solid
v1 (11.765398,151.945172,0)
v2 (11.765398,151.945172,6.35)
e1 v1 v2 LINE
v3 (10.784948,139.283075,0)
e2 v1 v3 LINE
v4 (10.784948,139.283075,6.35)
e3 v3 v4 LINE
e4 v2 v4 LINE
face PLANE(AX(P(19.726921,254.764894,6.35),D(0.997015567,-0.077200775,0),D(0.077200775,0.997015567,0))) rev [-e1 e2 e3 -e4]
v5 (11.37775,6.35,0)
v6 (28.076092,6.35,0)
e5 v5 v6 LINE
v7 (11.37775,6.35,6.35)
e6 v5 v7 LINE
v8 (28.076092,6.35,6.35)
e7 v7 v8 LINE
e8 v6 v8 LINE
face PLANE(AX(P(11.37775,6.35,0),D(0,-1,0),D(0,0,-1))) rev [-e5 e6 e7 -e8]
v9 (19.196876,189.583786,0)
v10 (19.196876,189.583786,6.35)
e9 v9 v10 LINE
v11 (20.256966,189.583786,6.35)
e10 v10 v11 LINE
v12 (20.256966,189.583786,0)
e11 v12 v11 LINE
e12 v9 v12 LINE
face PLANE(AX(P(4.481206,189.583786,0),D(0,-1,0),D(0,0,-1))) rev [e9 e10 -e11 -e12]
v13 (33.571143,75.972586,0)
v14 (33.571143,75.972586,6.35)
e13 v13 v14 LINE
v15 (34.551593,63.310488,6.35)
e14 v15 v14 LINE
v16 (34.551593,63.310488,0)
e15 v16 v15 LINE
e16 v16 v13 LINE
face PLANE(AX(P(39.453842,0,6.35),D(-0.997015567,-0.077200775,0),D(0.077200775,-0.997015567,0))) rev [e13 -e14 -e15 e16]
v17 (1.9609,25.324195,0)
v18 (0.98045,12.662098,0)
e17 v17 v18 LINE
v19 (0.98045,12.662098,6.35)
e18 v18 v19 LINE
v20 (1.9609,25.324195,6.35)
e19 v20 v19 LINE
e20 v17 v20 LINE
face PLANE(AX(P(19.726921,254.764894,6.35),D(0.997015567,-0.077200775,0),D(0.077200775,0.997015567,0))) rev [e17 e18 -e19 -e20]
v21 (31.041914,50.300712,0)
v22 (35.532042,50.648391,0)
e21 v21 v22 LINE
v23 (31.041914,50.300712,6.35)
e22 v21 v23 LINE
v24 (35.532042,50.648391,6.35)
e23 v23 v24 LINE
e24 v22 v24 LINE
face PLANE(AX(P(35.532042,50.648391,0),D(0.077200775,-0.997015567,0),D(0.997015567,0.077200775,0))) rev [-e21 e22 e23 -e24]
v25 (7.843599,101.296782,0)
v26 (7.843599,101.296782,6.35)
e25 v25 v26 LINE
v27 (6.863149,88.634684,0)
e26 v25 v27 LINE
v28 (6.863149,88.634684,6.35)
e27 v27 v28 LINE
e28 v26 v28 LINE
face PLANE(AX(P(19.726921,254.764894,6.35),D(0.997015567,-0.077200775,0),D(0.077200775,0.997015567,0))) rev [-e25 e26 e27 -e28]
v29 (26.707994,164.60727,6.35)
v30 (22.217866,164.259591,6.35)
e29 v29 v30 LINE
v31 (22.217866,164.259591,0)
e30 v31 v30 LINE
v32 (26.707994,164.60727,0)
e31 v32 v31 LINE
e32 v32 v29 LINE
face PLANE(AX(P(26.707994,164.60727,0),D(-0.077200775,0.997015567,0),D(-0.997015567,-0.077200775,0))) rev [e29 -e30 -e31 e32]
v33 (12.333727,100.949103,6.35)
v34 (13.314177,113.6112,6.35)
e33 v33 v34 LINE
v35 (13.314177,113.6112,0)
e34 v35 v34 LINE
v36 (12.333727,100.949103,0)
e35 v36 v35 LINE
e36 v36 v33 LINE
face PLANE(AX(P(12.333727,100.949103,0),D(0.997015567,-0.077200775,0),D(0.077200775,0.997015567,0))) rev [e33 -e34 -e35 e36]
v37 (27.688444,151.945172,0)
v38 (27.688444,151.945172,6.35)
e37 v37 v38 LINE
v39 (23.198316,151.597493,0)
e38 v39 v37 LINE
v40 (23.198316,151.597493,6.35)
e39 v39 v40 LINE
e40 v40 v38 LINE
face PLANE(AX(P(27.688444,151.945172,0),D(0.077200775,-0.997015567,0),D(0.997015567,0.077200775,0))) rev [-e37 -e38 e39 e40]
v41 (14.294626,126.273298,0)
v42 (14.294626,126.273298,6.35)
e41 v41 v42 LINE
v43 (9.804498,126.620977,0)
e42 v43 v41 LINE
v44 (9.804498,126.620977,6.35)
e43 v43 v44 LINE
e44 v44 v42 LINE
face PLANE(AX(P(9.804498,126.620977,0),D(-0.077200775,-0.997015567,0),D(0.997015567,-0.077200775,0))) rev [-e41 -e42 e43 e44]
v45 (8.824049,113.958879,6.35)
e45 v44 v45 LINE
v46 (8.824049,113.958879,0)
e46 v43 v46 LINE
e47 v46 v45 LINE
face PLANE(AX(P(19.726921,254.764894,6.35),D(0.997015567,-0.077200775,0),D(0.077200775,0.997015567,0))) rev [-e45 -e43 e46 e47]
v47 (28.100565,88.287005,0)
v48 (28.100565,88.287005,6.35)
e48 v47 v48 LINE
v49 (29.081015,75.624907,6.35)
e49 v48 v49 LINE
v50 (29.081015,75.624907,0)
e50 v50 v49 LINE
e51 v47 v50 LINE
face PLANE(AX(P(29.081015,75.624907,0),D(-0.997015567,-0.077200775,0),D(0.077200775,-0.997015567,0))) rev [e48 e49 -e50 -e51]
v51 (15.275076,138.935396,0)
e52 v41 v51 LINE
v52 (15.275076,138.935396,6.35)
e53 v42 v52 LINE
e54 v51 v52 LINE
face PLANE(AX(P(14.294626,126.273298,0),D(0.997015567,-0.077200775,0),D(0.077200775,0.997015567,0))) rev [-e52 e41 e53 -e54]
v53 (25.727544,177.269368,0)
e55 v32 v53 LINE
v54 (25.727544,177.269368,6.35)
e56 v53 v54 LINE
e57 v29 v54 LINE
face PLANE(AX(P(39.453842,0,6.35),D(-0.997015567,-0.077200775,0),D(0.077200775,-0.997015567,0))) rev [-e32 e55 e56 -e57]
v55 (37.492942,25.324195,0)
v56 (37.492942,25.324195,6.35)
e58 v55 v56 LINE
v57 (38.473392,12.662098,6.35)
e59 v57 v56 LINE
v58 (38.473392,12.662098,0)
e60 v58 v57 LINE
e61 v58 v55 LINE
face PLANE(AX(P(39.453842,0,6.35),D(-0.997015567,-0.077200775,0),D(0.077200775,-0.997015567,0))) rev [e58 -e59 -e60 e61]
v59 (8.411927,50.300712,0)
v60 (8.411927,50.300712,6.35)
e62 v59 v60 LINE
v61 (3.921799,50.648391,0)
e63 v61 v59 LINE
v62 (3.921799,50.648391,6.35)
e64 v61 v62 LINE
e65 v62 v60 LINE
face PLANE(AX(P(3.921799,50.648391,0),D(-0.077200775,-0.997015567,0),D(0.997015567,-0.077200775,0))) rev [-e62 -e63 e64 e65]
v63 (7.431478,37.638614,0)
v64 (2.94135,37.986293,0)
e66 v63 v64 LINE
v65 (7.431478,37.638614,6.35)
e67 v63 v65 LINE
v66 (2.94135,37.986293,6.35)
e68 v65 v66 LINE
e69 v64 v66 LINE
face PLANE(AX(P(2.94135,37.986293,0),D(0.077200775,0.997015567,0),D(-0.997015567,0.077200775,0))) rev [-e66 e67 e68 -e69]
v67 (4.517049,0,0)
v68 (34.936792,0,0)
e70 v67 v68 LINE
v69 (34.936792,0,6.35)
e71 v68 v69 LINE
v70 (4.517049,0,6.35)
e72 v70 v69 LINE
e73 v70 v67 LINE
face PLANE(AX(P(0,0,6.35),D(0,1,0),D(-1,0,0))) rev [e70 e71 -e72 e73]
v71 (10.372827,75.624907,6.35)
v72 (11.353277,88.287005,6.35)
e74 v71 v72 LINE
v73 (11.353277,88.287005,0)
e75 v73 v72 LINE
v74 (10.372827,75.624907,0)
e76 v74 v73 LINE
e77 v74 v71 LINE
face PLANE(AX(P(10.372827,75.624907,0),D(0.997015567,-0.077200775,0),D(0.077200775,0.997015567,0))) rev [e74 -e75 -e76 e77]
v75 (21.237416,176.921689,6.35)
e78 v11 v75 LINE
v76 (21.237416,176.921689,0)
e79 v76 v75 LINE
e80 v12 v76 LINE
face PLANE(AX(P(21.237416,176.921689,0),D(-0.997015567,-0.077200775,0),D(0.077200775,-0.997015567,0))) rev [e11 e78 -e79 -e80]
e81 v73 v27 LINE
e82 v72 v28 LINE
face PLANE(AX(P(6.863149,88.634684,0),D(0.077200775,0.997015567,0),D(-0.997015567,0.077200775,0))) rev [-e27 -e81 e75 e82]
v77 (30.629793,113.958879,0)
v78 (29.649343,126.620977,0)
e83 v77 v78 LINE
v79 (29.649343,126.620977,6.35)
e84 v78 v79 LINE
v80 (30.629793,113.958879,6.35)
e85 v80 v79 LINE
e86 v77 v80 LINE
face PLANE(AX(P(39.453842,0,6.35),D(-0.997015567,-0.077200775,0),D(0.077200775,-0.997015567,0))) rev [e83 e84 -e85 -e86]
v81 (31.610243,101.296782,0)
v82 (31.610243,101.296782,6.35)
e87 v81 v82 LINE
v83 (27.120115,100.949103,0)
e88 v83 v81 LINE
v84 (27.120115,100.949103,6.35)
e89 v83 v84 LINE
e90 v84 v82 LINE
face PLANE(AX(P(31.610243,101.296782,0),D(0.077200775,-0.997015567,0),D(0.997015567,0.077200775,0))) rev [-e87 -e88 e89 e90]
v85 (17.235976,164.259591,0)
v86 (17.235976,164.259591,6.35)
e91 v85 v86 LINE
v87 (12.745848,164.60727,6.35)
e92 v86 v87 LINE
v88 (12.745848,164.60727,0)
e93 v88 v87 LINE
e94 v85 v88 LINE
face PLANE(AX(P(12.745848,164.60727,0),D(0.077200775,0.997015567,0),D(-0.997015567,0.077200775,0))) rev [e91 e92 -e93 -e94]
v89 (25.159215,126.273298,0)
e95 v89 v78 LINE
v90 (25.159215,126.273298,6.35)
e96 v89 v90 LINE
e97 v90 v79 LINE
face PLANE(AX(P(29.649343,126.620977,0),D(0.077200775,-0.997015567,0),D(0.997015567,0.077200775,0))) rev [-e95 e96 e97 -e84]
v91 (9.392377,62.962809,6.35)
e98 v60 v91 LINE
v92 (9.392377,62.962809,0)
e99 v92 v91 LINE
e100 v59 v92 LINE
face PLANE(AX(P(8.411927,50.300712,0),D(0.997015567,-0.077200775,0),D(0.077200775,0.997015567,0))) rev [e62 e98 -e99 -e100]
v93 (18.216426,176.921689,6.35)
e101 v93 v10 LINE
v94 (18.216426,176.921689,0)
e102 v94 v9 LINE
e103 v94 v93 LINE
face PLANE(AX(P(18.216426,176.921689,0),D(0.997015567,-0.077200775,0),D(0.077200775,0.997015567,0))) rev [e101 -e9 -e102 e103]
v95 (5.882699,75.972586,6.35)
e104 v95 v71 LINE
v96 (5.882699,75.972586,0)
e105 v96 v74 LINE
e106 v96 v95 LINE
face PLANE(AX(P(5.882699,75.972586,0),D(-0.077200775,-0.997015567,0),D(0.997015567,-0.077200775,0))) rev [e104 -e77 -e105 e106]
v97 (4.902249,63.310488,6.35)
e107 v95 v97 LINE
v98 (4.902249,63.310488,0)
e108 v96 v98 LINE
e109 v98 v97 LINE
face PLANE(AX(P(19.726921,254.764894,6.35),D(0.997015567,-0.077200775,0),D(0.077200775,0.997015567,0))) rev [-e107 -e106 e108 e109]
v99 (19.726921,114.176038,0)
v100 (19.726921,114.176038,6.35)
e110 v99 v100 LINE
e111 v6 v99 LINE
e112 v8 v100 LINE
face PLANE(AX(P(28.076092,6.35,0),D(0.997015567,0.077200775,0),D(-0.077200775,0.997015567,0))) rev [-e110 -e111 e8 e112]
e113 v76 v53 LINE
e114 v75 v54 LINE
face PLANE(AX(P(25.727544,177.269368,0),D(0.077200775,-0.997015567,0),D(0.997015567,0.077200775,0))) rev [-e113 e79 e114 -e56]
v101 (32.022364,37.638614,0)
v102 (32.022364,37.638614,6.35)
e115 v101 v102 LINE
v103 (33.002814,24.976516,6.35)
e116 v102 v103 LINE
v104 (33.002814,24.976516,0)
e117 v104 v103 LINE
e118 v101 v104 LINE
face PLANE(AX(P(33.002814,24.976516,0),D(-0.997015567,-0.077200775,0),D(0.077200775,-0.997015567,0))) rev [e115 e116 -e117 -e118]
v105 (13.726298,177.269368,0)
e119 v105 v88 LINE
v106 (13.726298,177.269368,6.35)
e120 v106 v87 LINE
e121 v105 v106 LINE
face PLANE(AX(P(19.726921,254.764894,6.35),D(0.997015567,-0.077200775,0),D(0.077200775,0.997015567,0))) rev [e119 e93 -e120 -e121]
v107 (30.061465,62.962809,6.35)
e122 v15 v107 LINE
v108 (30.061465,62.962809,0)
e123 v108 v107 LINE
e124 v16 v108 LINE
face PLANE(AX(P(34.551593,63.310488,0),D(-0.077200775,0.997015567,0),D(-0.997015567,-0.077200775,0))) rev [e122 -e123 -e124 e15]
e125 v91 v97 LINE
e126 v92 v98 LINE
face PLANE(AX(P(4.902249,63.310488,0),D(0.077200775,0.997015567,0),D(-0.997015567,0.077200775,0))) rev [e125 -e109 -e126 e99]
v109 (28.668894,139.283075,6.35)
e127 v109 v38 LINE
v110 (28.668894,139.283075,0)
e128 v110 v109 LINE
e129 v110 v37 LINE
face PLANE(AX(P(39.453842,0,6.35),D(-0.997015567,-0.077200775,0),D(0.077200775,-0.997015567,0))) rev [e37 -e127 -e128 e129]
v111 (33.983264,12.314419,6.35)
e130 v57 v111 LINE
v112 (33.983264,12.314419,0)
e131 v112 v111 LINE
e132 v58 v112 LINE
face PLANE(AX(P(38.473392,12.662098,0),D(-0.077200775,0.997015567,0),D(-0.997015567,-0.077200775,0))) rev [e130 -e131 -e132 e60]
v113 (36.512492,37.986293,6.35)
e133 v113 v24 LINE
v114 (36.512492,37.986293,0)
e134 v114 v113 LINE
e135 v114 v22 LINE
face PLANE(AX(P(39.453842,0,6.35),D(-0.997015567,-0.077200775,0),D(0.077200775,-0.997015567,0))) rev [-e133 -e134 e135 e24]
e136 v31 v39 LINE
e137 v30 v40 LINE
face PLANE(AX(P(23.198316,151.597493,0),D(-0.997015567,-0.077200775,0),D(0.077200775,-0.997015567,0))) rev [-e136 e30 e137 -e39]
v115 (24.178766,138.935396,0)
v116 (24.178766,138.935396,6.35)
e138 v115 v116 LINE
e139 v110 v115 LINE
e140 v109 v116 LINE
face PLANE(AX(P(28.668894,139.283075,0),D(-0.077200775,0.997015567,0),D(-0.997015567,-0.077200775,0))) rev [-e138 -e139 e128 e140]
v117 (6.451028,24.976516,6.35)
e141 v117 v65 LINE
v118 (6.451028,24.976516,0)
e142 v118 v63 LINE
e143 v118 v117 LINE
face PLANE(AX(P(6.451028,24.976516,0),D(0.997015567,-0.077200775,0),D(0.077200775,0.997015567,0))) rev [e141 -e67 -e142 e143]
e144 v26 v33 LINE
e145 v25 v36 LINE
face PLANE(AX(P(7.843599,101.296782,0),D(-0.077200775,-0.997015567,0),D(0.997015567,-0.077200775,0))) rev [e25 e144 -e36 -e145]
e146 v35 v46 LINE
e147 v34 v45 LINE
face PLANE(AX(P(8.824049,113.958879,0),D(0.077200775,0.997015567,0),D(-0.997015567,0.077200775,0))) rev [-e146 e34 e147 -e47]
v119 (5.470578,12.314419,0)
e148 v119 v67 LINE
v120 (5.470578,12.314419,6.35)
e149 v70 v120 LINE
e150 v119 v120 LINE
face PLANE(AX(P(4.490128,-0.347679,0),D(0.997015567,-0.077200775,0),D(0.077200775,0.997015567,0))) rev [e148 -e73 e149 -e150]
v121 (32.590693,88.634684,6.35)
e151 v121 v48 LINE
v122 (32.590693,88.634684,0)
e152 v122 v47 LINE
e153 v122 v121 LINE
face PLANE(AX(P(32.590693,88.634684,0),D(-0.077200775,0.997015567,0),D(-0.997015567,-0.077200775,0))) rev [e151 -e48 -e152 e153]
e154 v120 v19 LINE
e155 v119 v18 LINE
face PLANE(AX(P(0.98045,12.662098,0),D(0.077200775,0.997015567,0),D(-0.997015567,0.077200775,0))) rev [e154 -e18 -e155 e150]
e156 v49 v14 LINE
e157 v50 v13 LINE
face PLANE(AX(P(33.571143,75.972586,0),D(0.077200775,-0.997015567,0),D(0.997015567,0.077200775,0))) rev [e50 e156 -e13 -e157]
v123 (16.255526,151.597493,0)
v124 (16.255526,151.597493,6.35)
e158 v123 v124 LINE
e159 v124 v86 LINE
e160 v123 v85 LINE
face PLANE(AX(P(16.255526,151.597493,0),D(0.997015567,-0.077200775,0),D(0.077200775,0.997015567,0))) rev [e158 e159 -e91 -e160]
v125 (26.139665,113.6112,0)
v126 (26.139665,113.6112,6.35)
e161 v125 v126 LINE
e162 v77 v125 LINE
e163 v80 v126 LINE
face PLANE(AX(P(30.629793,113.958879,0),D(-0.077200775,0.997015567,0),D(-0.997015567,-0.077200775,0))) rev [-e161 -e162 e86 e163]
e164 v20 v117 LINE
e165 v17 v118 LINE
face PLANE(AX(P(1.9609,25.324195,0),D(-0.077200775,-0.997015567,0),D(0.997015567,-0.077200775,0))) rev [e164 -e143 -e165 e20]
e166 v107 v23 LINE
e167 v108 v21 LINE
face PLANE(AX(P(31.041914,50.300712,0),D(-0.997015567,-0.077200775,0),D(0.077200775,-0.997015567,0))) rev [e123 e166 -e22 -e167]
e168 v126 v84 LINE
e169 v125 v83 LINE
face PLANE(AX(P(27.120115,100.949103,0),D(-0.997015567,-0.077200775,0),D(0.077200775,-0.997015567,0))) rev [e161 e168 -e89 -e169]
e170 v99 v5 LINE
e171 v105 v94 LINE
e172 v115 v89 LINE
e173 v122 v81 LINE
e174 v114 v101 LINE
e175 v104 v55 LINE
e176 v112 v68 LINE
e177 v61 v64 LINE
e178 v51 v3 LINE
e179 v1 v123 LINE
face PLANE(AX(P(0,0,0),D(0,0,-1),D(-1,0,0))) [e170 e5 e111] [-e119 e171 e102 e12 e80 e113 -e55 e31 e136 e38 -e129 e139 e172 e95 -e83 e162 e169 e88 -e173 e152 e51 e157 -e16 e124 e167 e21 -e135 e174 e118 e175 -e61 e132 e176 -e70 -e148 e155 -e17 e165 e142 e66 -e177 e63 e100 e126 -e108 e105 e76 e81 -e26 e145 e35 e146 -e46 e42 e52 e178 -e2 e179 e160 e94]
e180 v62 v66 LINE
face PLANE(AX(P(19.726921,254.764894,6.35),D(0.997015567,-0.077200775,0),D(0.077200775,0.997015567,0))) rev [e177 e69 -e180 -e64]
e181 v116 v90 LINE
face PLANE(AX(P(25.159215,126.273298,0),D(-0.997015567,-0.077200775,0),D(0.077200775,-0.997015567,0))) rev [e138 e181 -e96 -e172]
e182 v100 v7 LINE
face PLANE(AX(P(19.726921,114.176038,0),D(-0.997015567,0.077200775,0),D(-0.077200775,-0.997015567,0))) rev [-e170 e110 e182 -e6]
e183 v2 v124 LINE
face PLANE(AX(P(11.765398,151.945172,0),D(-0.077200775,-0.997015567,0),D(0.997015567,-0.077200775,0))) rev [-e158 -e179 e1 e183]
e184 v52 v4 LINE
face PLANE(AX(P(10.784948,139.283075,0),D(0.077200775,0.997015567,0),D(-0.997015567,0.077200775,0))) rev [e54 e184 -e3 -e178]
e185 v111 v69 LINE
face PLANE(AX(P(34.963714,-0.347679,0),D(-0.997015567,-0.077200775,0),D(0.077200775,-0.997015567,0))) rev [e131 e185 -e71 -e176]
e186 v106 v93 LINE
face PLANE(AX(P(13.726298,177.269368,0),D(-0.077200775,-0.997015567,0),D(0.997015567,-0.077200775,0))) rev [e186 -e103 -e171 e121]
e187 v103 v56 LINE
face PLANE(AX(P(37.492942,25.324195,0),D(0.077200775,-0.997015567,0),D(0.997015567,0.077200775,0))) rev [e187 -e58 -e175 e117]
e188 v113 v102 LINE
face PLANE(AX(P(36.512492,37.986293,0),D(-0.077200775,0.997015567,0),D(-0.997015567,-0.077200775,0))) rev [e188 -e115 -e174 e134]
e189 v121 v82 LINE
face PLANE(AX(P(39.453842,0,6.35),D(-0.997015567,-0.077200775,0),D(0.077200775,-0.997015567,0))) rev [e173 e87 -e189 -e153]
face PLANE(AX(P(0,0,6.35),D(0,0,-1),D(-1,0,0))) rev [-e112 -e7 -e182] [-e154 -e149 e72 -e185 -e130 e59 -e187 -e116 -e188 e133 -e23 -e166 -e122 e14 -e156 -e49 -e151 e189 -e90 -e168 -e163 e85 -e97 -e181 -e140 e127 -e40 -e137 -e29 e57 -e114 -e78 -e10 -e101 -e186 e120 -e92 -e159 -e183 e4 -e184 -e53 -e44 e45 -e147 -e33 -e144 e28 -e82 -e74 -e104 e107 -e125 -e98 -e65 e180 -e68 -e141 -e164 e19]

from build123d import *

# Parameters (mm, degrees)
BOSS_EXTRUDE1_DEPTH   = 6.35
CUT_EXTRUDE1_DEPTH    = 258.879971193
LPATTERN1_COUNT       = 9
LPATTERN1_PITCH       = 25.4
CUT_EXTRUDE2_DEPTH    = 258.879971193
LPATTERN3_START       = -252.481631985
LPATTERN3_OUTLINE_W   = 4.50356866
LPATTERN3_OUTLINE_H   = 6.35
LPATTERN3_DEPTH       = 52.327499141
LPATTERN3_START_2     = -187.454132844
LPATTERN3_2_OUTLINE_W = 4.50356866
LPATTERN3_2_OUTLINE_H = 6.35
LPATTERN3_2_DEPTH     = 12.7
LPATTERN3_START_3     = -162.054132844
LPATTERN3_3_OUTLINE_W = 4.50356866
LPATTERN3_3_OUTLINE_H = 6.35
LPATTERN3_3_DEPTH     = 12.7
LPATTERN3_START_4     = -136.654132844
LPATTERN3_4_OUTLINE_W = 4.50356866
LPATTERN3_4_OUTLINE_H = 6.35
LPATTERN3_4_DEPTH     = 12.7
LPATTERN3_START_5     = -111.254132844
LPATTERN3_5_OUTLINE_W = 4.50356866
LPATTERN3_5_OUTLINE_H = 6.35
LPATTERN3_5_DEPTH     = 12.7
LPATTERN3_START_6     = -85.854132844
LPATTERN3_6_OUTLINE_W = 4.50356866
LPATTERN3_6_OUTLINE_H = 6.35
LPATTERN3_6_DEPTH     = 12.7
LPATTERN3_START_7     = -60.454132844
LPATTERN3_7_OUTLINE_W = 4.50356866
LPATTERN3_7_OUTLINE_H = 6.35
LPATTERN3_7_DEPTH     = 12.7
LPATTERN3_START_8     = -35.054132844
LPATTERN3_8_OUTLINE_W = 4.50356866
LPATTERN3_8_OUTLINE_H = 6.35
LPATTERN3_8_DEPTH     = 12.7
LPATTERN3_START_9     = -225.661600657
LPATTERN3_9_OUTLINE_W = 2.832525799
LPATTERN3_9_OUTLINE_H = 6.35
LPATTERN3_9_DEPTH     = 13.028393953
SKETCH4_W             = 28.782231323
SKETCH4_H             = 17.896251878
CUT_EXTRUDE3_DEPTH    = 207.312084539
CUT_EXTRUDE4_DEPTH    = 194.552412762


# Read off the part's stored shape, not the designer's step: LPattern3
with BuildPart() as part:
    # Sketch1 → Boss-Extrude1 (new body)
    with BuildSketch(Plane.XY):
        Polygon((19.726920908, 254.76489438), (0, 0), (39.453841816, 0), align=None)
    extrude(amount=BOSS_EXTRUDE1_DEPTH)

    # Sketch2 → Cut-Extrude1 (cut, through all)
    with BuildSketch(Plane.XY.offset(6.35)):
        Polygon((0, 0), (0.98044984, 12.662097698), (5.4705779, 12.314418708), (4.490128061, -0.34767899), align=None)
    cut_extrude1 = extrude(amount=-CUT_EXTRUDE1_DEPTH, mode=Mode.SUBTRACT)

    # LPattern1: Cut-Extrude1 ×9
    with Locations(*[Vector(0.07720077476736964, 0.9970155667667973, 0) * (i * LPATTERN1_PITCH) for i in range(1, LPATTERN1_COUNT)]):
        add(cut_extrude1, mode=Mode.SUBTRACT)

    # Sketch3 → Cut-Extrude2 (cut, through all)
    with BuildSketch(Plane.XY.offset(6.35)):
        Polygon((39.453841816, 0), (38.473391976, 12.662097698), (33.983263916, 12.314418708), (34.963713756, -0.34767899), align=None)
    extrude(amount=-CUT_EXTRUDE2_DEPTH, mode=Mode.SUBTRACT)

    # LPattern3 outline → LPattern3 (cut)
    with BuildSketch(Plane(origin=(0, 0, 0), x_dir=(0.9970155667667971, 0.07720077476736921, 0), z_dir=(0.07720077476736921, -0.9970155667667973, 0)).offset(LPATTERN3_START)):
        with Locations((37.084310129, 3.175)):
            Rectangle(LPATTERN3_OUTLINE_W, LPATTERN3_OUTLINE_H)
    extrude(amount=LPATTERN3_DEPTH, mode=Mode.SUBTRACT)

    # LPattern3 2 outline → LPattern3 2 (cut)
    with BuildSketch(Plane(origin=(0, 0, 0), x_dir=(0.9970155667667971, 0.07720077476736921, 0), z_dir=(0.07720077476736921, -0.9970155667667973, 0)).offset(LPATTERN3_START_2)):
        with Locations((37.084310129, 3.175)):
            Rectangle(LPATTERN3_2_OUTLINE_W, LPATTERN3_2_OUTLINE_H)
    extrude(amount=LPATTERN3_2_DEPTH, mode=Mode.SUBTRACT)

    # LPattern3 3 outline → LPattern3 3 (cut)
    with BuildSketch(Plane(origin=(0, 0, 0), x_dir=(0.9970155667667971, 0.07720077476736921, 0), z_dir=(0.07720077476736921, -0.9970155667667973, 0)).offset(LPATTERN3_START_3)):
        with Locations((37.084310129, 3.175)):
            Rectangle(LPATTERN3_3_OUTLINE_W, LPATTERN3_3_OUTLINE_H)
    extrude(amount=LPATTERN3_3_DEPTH, mode=Mode.SUBTRACT)

    # LPattern3 4 outline → LPattern3 4 (cut)
    with BuildSketch(Plane(origin=(0, 0, 0), x_dir=(0.9970155667667971, 0.07720077476736921, 0), z_dir=(0.07720077476736921, -0.9970155667667973, 0)).offset(LPATTERN3_START_4)):
        with Locations((37.084310129, 3.175)):
            Rectangle(LPATTERN3_4_OUTLINE_W, LPATTERN3_4_OUTLINE_H)
    extrude(amount=LPATTERN3_4_DEPTH, mode=Mode.SUBTRACT)

    # LPattern3 5 outline → LPattern3 5 (cut)
    with BuildSketch(Plane(origin=(0, 0, 0), x_dir=(0.9970155667667971, 0.07720077476736921, 0), z_dir=(0.07720077476736921, -0.9970155667667973, 0)).offset(LPATTERN3_START_5)):
        with Locations((37.084310129, 3.175)):
            Rectangle(LPATTERN3_5_OUTLINE_W, LPATTERN3_5_OUTLINE_H)
    extrude(amount=LPATTERN3_5_DEPTH, mode=Mode.SUBTRACT)

    # LPattern3 6 outline → LPattern3 6 (cut)
    with BuildSketch(Plane(origin=(0, 0, 0), x_dir=(0.9970155667667971, 0.07720077476736921, 0), z_dir=(0.07720077476736921, -0.9970155667667973, 0)).offset(LPATTERN3_START_6)):
        with Locations((37.084310129, 3.175)):
            Rectangle(LPATTERN3_6_OUTLINE_W, LPATTERN3_6_OUTLINE_H)
    extrude(amount=LPATTERN3_6_DEPTH, mode=Mode.SUBTRACT)

    # LPattern3 7 outline → LPattern3 7 (cut)
    with BuildSketch(Plane(origin=(0, 0, 0), x_dir=(0.9970155667667971, 0.07720077476736921, 0), z_dir=(0.07720077476736921, -0.9970155667667973, 0)).offset(LPATTERN3_START_7)):
        with Locations((37.084310129, 3.175)):
            Rectangle(LPATTERN3_7_OUTLINE_W, LPATTERN3_7_OUTLINE_H)
    extrude(amount=LPATTERN3_7_DEPTH, mode=Mode.SUBTRACT)

    # LPattern3 8 outline → LPattern3 8 (cut)
    with BuildSketch(Plane(origin=(0, 0, 0), x_dir=(0.9970155667667971, 0.07720077476736921, 0), z_dir=(0.07720077476736921, -0.9970155667667973, 0)).offset(LPATTERN3_START_8)):
        with Locations((37.084310129, 3.175)):
            Rectangle(LPATTERN3_8_OUTLINE_W, LPATTERN3_8_OUTLINE_H)
    extrude(amount=LPATTERN3_8_DEPTH, mode=Mode.SUBTRACT)

    # LPattern3 9 outline → LPattern3 9 (cut)
    with BuildSketch(Plane(origin=(0, 0, 0), x_dir=(0.9970155667667971, 0.07720077476736921, 0), z_dir=(0.07720077476736921, -0.9970155667667973, 0)).offset(LPATTERN3_START_9)):
        with Locations((33.416262899, 3.175)):
            Rectangle(LPATTERN3_9_OUTLINE_W, LPATTERN3_9_OUTLINE_H)
    extrude(amount=LPATTERN3_9_DEPTH, mode=Mode.SUBTRACT)

    # Sketch4 → Cut-Extrude3 (cut, through all)
    with BuildSketch(Plane.XY.offset(6.35)):
        with Locations((18.872321894, 198.531912418)):
            Rectangle(SKETCH4_W, SKETCH4_H)
    extrude(amount=-CUT_EXTRUDE3_DEPTH, mode=Mode.SUBTRACT)

    # Sketch5 → Cut-Extrude4 (cut, through all)
    with BuildSketch(Plane.XY.offset(6.35)):
        Polygon((19.726920908, 114.176037685), (11.377749715, 6.35), (28.076092101, 6.35), align=None)
    extrude(amount=-CUT_EXTRUDE4_DEPTH, mode=Mode.SUBTRACT)


solid = part.part
